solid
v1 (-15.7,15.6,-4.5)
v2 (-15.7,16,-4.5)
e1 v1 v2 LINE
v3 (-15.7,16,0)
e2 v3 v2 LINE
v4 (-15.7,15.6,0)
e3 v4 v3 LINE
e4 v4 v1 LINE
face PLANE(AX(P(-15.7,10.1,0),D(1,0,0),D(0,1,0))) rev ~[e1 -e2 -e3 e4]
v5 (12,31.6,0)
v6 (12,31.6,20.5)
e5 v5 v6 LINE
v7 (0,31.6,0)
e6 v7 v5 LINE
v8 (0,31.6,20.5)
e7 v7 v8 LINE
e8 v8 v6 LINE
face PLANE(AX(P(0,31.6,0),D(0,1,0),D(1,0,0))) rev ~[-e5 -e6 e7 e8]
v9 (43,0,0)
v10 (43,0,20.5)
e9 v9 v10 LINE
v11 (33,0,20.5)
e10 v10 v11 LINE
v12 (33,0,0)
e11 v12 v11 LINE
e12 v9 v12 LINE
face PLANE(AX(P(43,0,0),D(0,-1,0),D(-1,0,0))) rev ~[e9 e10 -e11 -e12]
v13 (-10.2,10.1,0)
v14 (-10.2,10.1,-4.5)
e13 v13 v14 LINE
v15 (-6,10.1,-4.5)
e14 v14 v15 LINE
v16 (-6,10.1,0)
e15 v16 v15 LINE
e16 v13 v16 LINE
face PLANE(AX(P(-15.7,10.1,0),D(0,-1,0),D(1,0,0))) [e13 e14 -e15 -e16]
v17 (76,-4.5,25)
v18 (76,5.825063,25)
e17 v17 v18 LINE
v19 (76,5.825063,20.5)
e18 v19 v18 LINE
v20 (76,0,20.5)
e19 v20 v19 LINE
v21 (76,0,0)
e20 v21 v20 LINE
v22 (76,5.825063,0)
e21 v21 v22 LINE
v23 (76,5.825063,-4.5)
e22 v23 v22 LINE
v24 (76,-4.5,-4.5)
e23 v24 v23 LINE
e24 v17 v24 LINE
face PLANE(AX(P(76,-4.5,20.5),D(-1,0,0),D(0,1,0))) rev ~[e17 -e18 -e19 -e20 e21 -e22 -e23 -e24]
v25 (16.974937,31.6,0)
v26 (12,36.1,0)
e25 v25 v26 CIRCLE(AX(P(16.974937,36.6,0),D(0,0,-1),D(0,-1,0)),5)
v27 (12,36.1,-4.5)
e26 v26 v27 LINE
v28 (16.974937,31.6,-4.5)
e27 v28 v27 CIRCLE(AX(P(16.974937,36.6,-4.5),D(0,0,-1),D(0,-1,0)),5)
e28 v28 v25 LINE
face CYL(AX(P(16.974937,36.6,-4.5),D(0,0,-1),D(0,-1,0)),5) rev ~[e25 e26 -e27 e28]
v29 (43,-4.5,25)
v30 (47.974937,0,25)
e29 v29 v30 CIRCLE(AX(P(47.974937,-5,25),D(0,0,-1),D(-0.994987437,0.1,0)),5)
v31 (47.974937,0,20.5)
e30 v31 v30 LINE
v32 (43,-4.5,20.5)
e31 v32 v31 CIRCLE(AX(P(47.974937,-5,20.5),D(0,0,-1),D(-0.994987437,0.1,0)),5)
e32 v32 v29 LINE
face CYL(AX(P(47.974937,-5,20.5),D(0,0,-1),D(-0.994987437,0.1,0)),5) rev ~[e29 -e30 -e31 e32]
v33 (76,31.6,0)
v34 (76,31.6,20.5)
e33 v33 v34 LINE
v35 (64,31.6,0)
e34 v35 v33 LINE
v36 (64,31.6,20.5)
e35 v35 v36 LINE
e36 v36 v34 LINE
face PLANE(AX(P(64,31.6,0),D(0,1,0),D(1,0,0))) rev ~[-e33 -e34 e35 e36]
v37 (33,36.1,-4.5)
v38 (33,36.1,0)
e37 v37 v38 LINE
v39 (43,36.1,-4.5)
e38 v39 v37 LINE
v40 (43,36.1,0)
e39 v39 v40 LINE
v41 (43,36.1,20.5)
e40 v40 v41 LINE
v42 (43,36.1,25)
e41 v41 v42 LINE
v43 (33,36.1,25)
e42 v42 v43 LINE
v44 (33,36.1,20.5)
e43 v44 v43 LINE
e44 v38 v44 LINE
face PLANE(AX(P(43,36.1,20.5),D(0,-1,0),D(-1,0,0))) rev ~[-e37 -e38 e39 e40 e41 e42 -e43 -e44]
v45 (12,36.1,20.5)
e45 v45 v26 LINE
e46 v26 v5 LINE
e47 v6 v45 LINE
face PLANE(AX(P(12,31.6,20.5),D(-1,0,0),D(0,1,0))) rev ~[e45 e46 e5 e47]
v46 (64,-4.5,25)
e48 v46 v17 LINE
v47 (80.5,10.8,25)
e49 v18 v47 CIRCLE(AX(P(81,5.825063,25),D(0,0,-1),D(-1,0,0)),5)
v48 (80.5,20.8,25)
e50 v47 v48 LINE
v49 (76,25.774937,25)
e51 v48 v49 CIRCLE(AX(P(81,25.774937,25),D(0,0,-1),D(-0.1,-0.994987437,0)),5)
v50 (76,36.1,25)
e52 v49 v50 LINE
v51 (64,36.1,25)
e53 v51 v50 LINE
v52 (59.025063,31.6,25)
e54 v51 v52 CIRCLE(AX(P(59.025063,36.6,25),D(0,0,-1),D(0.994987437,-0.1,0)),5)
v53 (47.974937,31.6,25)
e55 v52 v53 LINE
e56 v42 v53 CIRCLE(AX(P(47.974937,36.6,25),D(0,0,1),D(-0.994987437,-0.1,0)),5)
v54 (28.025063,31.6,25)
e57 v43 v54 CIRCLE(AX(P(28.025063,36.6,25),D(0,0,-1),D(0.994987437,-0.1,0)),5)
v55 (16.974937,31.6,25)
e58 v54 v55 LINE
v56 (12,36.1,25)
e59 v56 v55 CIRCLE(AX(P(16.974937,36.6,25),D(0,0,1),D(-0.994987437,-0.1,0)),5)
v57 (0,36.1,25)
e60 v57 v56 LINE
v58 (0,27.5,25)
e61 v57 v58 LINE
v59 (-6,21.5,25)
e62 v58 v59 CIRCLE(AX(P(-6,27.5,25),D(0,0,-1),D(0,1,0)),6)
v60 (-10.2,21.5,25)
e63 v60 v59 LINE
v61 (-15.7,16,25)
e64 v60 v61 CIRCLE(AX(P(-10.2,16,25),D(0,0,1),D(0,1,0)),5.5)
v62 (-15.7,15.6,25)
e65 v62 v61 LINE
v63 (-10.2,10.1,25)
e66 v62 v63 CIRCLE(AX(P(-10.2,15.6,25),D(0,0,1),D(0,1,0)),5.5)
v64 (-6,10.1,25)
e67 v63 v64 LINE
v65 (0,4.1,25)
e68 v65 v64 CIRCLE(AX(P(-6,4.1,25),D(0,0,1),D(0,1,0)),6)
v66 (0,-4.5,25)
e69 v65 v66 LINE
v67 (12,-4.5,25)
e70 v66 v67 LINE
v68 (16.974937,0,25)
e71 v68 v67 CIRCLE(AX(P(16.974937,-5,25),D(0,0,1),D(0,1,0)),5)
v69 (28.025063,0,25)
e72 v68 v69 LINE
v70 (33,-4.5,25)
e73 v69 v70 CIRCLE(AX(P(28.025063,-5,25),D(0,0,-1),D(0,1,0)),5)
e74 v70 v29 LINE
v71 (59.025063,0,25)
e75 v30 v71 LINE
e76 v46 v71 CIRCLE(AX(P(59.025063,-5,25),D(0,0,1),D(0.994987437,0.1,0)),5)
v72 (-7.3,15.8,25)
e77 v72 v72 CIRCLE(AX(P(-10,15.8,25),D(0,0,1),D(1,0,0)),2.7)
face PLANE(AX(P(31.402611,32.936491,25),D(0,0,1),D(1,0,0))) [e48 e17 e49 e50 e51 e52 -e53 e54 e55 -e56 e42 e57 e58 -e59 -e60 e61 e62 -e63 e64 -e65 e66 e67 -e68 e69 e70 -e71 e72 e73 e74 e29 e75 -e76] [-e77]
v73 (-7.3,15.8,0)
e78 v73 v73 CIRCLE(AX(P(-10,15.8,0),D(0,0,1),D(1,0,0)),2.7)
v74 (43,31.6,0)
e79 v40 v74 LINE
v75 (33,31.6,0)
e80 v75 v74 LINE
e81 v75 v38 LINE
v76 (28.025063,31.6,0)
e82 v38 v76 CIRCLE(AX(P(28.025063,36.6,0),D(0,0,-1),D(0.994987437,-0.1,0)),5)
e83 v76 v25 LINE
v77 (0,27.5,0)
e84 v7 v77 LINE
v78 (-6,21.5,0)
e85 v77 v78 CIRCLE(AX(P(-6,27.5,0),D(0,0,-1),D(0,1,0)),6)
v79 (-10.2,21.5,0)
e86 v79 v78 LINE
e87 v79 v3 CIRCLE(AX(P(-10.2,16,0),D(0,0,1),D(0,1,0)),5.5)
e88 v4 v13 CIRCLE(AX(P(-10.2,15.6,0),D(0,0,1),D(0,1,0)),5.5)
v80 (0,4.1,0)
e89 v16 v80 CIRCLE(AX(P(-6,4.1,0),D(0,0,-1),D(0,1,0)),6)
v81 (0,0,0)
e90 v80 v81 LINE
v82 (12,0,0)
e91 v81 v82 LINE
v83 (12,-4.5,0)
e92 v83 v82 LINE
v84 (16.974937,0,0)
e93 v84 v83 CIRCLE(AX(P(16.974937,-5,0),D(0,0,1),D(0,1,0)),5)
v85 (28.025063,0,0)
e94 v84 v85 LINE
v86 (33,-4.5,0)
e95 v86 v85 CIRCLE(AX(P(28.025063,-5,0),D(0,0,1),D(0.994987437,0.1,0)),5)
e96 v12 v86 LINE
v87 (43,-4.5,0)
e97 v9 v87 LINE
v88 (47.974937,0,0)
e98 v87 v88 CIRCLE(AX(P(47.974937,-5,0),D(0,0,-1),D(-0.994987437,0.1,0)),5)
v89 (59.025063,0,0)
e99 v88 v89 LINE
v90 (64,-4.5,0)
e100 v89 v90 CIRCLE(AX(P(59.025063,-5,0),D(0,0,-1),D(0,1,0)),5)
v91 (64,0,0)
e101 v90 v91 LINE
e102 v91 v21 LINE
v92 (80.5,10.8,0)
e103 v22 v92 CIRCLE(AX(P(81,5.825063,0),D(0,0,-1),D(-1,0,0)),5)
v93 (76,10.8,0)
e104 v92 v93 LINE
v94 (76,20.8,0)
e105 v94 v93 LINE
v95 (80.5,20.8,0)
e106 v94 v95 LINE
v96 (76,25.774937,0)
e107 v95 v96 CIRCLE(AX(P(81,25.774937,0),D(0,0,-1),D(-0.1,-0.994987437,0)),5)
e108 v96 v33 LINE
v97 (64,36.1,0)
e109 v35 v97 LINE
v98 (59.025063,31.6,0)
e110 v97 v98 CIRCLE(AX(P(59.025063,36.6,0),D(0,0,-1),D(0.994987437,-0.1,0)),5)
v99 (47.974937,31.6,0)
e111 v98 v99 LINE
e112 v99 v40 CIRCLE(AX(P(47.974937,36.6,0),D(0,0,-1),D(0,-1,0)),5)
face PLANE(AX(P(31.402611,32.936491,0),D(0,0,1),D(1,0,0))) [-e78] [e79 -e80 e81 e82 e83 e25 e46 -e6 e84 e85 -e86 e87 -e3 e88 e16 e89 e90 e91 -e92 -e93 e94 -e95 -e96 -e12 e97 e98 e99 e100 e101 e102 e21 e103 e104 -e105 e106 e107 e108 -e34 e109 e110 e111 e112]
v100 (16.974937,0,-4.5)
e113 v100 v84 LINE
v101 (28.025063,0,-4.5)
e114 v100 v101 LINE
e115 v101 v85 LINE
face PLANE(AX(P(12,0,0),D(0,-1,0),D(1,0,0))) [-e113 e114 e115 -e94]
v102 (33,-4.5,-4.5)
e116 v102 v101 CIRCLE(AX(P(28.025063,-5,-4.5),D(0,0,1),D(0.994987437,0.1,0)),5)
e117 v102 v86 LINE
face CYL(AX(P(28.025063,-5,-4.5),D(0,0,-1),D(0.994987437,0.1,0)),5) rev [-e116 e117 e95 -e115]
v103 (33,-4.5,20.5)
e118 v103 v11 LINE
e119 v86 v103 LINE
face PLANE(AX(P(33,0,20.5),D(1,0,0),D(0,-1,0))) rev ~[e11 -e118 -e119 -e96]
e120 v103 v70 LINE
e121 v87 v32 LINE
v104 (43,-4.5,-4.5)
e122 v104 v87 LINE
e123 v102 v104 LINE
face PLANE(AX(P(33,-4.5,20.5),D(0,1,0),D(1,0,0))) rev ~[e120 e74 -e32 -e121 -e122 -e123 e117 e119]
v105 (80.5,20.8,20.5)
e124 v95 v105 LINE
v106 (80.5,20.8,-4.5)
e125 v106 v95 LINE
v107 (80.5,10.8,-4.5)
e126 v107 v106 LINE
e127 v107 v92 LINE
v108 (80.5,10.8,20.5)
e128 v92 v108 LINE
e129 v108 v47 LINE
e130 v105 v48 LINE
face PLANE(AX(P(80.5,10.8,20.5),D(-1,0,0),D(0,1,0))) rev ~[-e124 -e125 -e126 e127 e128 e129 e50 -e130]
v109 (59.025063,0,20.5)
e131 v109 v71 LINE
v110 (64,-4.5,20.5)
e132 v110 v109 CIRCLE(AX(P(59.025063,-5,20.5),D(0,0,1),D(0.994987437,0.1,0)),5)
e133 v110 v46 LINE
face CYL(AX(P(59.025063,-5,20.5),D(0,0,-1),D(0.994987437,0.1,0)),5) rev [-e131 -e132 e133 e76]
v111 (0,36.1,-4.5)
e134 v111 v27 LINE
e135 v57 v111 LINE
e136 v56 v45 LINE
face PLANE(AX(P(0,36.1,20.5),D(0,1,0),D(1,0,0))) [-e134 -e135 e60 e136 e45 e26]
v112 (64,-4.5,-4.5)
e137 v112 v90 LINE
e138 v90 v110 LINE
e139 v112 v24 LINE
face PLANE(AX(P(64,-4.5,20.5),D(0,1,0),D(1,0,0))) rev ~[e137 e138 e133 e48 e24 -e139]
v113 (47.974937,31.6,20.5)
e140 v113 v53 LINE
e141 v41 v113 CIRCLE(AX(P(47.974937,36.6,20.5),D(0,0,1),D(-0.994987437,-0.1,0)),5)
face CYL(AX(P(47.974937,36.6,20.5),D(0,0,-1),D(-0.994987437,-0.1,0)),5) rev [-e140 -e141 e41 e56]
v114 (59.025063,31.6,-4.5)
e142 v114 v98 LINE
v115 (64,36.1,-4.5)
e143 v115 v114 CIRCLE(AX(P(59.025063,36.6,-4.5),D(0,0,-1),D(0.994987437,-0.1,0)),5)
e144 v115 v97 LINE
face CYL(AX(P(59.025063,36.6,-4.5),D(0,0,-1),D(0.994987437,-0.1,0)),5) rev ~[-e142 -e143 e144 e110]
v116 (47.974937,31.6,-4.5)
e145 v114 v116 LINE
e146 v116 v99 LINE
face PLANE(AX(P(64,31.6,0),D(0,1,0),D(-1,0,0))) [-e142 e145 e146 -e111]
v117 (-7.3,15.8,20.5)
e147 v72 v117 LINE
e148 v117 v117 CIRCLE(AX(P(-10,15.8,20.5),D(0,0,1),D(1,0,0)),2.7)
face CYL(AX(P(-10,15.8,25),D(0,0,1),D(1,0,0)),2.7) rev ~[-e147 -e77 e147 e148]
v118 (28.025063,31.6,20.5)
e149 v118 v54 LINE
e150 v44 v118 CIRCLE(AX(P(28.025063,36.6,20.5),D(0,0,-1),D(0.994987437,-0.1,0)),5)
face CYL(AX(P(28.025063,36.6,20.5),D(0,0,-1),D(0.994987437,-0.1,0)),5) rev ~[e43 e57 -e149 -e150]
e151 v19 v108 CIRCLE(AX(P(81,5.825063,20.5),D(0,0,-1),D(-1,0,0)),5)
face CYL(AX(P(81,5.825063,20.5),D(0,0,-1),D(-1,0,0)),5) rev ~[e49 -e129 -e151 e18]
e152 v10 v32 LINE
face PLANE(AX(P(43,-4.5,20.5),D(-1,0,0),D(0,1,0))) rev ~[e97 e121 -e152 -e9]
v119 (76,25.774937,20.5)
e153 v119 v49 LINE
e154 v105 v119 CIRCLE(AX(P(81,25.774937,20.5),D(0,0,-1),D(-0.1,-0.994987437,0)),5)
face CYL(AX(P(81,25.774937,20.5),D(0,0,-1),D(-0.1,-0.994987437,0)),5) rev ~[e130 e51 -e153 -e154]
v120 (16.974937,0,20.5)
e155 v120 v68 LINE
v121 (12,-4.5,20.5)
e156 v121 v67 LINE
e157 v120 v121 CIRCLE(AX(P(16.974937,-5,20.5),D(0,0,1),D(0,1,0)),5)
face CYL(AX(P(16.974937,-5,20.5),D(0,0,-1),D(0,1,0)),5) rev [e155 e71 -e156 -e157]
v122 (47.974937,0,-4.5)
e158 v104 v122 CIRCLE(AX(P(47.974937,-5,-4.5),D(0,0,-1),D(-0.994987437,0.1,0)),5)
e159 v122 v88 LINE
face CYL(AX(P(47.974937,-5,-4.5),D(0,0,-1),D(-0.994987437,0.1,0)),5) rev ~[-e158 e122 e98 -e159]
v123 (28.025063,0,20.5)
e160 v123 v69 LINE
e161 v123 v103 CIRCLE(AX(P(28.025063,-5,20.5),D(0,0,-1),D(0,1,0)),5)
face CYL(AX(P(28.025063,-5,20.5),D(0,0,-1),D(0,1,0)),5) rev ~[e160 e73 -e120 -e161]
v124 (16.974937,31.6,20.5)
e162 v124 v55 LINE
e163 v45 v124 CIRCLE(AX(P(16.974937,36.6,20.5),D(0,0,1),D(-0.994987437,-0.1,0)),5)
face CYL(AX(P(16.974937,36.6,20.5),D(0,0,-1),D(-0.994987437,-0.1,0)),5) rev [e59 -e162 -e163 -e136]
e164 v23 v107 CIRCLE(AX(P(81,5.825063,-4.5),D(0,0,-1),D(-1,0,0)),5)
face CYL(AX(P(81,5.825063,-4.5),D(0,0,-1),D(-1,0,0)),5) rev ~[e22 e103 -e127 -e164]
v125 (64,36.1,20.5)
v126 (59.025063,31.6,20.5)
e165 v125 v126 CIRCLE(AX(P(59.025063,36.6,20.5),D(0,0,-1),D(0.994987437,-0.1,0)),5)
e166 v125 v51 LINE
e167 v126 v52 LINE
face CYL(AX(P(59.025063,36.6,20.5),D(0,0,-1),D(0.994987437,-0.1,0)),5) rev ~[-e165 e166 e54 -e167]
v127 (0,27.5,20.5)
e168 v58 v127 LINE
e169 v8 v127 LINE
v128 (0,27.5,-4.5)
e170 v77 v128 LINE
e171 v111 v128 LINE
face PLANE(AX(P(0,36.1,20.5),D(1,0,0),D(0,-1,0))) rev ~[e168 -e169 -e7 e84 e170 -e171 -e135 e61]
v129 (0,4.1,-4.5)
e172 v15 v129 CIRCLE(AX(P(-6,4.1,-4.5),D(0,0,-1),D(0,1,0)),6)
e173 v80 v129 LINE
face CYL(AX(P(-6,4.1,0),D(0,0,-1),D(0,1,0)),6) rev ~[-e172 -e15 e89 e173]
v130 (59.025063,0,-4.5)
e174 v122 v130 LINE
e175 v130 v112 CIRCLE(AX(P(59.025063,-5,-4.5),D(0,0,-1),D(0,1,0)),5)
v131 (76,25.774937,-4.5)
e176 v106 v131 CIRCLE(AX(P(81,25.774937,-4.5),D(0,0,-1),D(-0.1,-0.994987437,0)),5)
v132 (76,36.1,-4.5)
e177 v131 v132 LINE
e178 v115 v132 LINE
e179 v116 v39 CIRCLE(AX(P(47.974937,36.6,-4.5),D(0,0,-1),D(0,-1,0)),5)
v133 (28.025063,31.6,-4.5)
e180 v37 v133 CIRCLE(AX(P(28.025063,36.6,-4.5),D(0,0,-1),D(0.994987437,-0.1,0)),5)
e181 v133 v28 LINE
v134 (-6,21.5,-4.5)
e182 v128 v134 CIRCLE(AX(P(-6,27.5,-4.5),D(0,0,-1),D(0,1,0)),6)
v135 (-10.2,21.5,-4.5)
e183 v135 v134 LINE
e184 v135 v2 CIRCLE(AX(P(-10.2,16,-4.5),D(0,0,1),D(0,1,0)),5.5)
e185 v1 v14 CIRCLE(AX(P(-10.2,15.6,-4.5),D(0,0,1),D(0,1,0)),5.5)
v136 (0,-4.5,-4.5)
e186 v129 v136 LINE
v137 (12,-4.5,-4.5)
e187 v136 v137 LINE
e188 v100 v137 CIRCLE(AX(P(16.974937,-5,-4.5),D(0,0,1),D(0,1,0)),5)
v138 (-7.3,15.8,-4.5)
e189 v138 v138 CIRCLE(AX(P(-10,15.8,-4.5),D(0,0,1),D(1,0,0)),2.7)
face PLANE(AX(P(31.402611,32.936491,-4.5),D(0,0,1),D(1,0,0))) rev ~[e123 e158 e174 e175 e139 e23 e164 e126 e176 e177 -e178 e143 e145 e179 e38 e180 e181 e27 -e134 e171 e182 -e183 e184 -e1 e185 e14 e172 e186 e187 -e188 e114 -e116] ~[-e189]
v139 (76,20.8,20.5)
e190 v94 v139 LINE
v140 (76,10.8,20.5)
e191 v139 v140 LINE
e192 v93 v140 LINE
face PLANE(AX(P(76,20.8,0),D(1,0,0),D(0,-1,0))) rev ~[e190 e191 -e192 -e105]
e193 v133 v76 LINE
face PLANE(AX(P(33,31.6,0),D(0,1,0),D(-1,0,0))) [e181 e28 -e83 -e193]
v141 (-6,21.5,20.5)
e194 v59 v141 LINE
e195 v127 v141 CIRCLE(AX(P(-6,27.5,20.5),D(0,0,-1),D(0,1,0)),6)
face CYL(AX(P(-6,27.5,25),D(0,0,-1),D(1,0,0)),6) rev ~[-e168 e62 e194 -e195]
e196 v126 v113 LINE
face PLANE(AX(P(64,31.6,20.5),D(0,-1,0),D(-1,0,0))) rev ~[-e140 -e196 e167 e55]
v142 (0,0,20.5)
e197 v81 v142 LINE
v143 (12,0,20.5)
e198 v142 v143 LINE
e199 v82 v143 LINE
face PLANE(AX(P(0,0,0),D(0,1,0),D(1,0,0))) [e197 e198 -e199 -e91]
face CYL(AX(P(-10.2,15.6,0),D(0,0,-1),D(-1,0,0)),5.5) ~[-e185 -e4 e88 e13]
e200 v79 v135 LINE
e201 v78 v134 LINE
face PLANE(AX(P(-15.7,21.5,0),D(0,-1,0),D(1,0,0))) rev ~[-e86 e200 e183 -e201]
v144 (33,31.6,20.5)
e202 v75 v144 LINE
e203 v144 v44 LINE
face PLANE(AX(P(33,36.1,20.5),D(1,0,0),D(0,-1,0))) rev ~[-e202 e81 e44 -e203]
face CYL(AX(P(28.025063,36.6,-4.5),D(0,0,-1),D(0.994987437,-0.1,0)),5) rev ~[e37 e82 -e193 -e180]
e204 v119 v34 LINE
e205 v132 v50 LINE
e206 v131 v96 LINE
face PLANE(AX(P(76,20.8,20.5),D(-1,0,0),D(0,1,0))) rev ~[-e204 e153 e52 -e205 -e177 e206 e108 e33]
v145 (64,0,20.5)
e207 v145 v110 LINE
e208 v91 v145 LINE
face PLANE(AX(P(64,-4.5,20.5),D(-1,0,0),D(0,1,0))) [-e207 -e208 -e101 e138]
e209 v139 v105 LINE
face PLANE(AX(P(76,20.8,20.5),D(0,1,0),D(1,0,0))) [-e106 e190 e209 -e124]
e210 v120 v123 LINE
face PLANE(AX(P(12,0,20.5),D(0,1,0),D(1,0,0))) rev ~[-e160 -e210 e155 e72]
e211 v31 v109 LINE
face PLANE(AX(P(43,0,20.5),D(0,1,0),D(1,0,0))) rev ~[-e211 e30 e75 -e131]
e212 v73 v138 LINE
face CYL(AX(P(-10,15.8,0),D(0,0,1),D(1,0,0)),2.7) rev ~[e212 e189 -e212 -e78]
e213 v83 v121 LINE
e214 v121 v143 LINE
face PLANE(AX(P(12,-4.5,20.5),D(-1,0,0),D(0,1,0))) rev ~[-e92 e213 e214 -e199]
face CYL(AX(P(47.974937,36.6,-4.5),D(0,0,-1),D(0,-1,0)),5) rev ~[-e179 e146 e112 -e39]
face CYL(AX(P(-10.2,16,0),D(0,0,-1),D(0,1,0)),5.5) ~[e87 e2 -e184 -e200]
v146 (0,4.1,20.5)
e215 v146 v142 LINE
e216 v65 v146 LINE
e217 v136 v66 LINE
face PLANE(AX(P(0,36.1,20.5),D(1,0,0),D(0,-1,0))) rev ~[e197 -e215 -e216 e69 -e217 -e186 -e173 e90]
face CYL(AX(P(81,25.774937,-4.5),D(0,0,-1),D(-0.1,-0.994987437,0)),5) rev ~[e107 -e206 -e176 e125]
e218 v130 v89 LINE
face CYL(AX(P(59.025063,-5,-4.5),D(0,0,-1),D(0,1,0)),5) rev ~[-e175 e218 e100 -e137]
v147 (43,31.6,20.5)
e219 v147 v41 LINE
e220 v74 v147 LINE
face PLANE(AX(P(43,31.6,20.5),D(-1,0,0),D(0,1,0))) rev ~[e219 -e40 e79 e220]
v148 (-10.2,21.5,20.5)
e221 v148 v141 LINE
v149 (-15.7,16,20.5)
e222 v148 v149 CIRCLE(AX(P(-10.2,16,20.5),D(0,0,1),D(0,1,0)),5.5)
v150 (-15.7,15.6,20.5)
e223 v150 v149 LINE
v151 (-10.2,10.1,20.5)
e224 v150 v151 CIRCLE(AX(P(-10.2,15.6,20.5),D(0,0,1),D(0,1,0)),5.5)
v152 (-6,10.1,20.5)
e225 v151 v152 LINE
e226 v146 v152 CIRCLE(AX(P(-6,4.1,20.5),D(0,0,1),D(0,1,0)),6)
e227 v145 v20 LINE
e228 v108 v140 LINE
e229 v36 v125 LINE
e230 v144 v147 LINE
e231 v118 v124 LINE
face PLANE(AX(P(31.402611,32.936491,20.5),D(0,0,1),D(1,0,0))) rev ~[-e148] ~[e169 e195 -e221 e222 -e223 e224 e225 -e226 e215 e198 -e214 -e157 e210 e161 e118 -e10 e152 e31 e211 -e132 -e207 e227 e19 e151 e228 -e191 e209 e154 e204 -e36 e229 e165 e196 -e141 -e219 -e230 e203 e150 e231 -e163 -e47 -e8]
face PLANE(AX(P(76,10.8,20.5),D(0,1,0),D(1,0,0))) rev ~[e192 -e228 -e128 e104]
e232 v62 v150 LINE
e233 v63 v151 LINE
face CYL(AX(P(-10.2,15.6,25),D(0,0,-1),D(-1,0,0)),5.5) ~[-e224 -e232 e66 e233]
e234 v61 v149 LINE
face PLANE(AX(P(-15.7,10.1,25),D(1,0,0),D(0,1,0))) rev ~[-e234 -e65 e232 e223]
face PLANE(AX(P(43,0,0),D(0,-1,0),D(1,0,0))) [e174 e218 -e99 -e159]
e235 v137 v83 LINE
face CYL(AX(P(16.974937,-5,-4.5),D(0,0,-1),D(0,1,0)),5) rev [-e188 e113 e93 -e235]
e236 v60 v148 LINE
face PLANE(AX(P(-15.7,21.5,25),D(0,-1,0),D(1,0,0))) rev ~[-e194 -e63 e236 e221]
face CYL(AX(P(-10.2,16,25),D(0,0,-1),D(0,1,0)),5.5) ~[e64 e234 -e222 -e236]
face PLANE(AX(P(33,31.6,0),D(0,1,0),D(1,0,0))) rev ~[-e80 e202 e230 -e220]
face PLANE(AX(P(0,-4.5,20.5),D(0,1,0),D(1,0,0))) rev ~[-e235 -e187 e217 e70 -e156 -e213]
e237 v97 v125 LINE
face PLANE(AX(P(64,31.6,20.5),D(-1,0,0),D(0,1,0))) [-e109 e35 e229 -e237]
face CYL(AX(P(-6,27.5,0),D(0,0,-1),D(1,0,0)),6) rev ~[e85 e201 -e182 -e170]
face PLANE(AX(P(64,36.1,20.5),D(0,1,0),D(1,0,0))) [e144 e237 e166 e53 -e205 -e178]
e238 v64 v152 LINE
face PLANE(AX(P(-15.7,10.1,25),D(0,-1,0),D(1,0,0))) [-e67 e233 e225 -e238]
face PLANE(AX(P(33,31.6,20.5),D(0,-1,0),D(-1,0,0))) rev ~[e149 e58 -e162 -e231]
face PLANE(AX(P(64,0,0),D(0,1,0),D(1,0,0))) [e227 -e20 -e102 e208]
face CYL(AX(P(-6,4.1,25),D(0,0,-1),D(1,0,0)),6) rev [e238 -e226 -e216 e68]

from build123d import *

# Parameters (mm, degrees)
F0_W        = 12
F0_H        = 4.5
F0_W_2      = 4.5
F0_H_2      = 5
F1_DEPTH    = 4.5
F2_DEPTH    = 20.5
F3_START    = 20.5
F3_DEPTH    = 4.5
F4_T1_DEPTH = 4.5
F4_T3_DEPTH = 4.5
F5_T1_DEPTH = 4.5
F5_T3_DEPTH = 4.5
F7_START    = -25
F6_W        = 15.7
F6_H        = 11.4
F6_R        = 2.7
F7_DEPTH    = 4.5
F8_DEPTH    = 4.5
F9_R        = 6
F10_R       = 5.5


# Not quite as in the source:
# - a fillet or chamfer that OpenCascade refuses, or shapes differently, is made with other operations: its cross-section is extruded or revolved along the edge and cut away or added


with BuildPart() as f1:
    # F0 (on Top) → F1 (new body)
    with BuildSketch(Plane.XY):
        Polygon((12, 31.6), (0, 31.6), (0, 0), (12, 0), (33, 0), (38, 0), (43, 0), (64, 0), (76, 0), (76, 10.8), (76, 15.8), (76, 20.8), (76, 31.6), (64, 31.6), (43, 31.6), (38, 31.6), (33, 31.6), align=None)
        with Locations((6, -2.25)):
            Rectangle(F0_W, F0_H)
        Polygon((38, 0), (33, 0), (33, -4.5), (43, -4.5), (43, 0), align=None)
        with Locations((70, -2.25)):
            Rectangle(F0_W, F0_H)
        with Locations((78.25, 13.3)):
            Rectangle(F0_W_2, F0_H_2)
        with Locations((78.25, 18.3)):
            Rectangle(F0_W_2, F0_H_2)
        with Locations((70, 33.85)):
            Rectangle(F0_W, F0_H)
        Polygon((33, 36.1), (33, 31.6), (38, 31.6), (43, 31.6), (43, 36.1), align=None)
        with Locations((6, 33.85)):
            Rectangle(F0_W, F0_H)
    extrude(amount=-F1_DEPTH)

    # F0 (on Top) → F2 (join)
    with BuildSketch(Plane.XY):
        with Locations((6, -2.25)):
            Rectangle(F0_W, F0_H)
        Polygon((38, 0), (33, 0), (33, -4.5), (43, -4.5), (43, 0), align=None)
        Polygon((33, 36.1), (33, 31.6), (38, 31.6), (43, 31.6), (43, 36.1), align=None)
        with Locations((6, 33.85)):
            Rectangle(F0_W, F0_H)
        with Locations((70, -2.25)):
            Rectangle(F0_W, F0_H)
        with Locations((78.25, 13.3)):
            Rectangle(F0_W_2, F0_H_2)
        with Locations((78.25, 18.3)):
            Rectangle(F0_W_2, F0_H_2)
        with Locations((70, 33.85)):
            Rectangle(F0_W, F0_H)
    extrude(amount=F2_DEPTH)

    # F0 (on Top) → F3 (join)
    with BuildSketch(Plane.XY.offset(F3_START)):
        with Locations((6, 33.85)):
            Rectangle(F0_W, F0_H)
        Polygon((12, 31.6), (0, 31.6), (0, 0), (12, 0), (33, 0), (38, 0), (43, 0), (64, 0), (76, 0), (76, 10.8), (76, 15.8), (76, 20.8), (76, 31.6), (64, 31.6), (43, 31.6), (38, 31.6), (33, 31.6), align=None)
        with Locations((6, -2.25)):
            Rectangle(F0_W, F0_H)
        Polygon((33, 36.1), (33, 31.6), (38, 31.6), (43, 31.6), (43, 36.1), align=None)
        Polygon((38, 0), (33, 0), (33, -4.5), (43, -4.5), (43, 0), align=None)
        with Locations((70, 33.85)):
            Rectangle(F0_W, F0_H)
        with Locations((70, -2.25)):
            Rectangle(F0_W, F0_H)
        with Locations((78.25, 18.3)):
            Rectangle(F0_W_2, F0_H_2)
        with Locations((78.25, 13.3)):
            Rectangle(F0_W_2, F0_H_2)
    extrude(amount=F3_DEPTH)

    # F4: fillet of radius 5 on 18 edges, made by hand

    # F4_s2 → F4_t1 (join)
    with BuildSketch(Plane.XY.offset(20.5)):
        with BuildLine():
            ThreePointArc((16.9749371855, 0), (13.6208352193, -1.2919007565), (12, -4.5))
            Line((12, -4.5), (12, 0))
            Line((12, 0), (16.9749371855, 0))
        make_face()
        with BuildLine():
            ThreePointArc((28.0250628145, 0), (31.3791647807, -1.2919007565), (33, -4.5))
            Line((33, -4.5), (33, 0))
            Line((33, 0), (28.0250628145, 0))
        make_face()
        with BuildLine():
            ThreePointArc((43, -4.5), (44.6208352193, -1.2919007565), (47.9749371855, 0))
            Line((47.9749371855, 0), (43, 0))
            Line((43, 0), (43, -4.5))
        make_face()
        with BuildLine():
            ThreePointArc((64, -4.5), (62.3791647807, -1.2919007565), (59.0250628145, 0))
            Line((59.0250628145, 0), (64, 0))
            Line((64, 0), (64, -4.5))
        make_face()
        with BuildLine():
            ThreePointArc((76, 5.8250628145), (77.2919007565, 9.1791647807), (80.5, 10.8))
            Line((80.5, 10.8), (76, 10.8))
            Line((76, 10.8), (76, 5.8250628145))
        make_face()
        with BuildLine():
            ThreePointArc((80.5, 20.8), (77.2919007565, 22.4208352193), (76, 25.7749371855))
            Line((76, 25.7749371855), (76, 20.8))
            Line((76, 20.8), (80.5, 20.8))
        make_face()
        with BuildLine():
            ThreePointArc((43, 36.1), (44.6208352193, 32.8919007565), (47.9749371855, 31.6))
            Line((47.9749371855, 31.6), (43, 31.6))
            Line((43, 31.6), (43, 36.1))
        make_face()
        with BuildLine():
            ThreePointArc((12, 36.1), (13.6208352193, 32.8919007565), (16.9749371855, 31.6))
            Line((16.9749371855, 31.6), (12, 31.6))
            Line((12, 31.6), (12, 36.1))
        make_face()
        with BuildLine():
            ThreePointArc((64, 36.1), (62.3791647807, 32.8919007565), (59.0250628145, 31.6))
            Line((59.0250628145, 31.6), (64, 31.6))
            Line((64, 31.6), (64, 36.1))
        make_face()
    extrude(amount=F4_T1_DEPTH)

    # F4_s4 → F4_t3 (join)
    with BuildSketch(Plane.XY.offset(-4.5)):
        with BuildLine():
            ThreePointArc((16.9749371855, 0), (13.6208352193, -1.2919007565), (12, -4.5))
            Line((12, -4.5), (12, 0))
            Line((12, 0), (16.9749371855, 0))
        make_face()
        with BuildLine():
            ThreePointArc((33, -4.5), (31.3791647807, -1.2919007565), (28.0250628145, 0))
            Line((28.0250628145, 0), (33, 0))
            Line((33, 0), (33, -4.5))
        make_face()
        with BuildLine():
            ThreePointArc((43, -4.5), (44.6208352193, -1.2919007565), (47.9749371855, 0))
            Line((47.9749371855, 0), (43, 0))
            Line((43, 0), (43, -4.5))
        make_face()
        with BuildLine():
            ThreePointArc((59.0250628145, 0), (62.3791647807, -1.2919007565), (64, -4.5))
            Line((64, -4.5), (64, 0))
            Line((64, 0), (59.0250628145, 0))
        make_face()
        with BuildLine():
            ThreePointArc((76, 5.8250628145), (77.2919007565, 9.1791647807), (80.5, 10.8))
            Line((80.5, 10.8), (76, 10.8))
            Line((76, 10.8), (76, 5.8250628145))
        make_face()
        with BuildLine():
            ThreePointArc((80.5, 20.8), (77.2919007565, 22.4208352193), (76, 25.7749371855))
            Line((76, 25.7749371855), (76, 20.8))
            Line((76, 20.8), (80.5, 20.8))
        make_face()
        with BuildLine():
            ThreePointArc((47.9749371855, 31.6), (44.6208352193, 32.8919007565), (43, 36.1))
            Line((43, 36.1), (43, 31.6))
            Line((43, 31.6), (47.9749371855, 31.6))
        make_face()
        with BuildLine():
            ThreePointArc((16.9749371855, 31.6), (13.6208352193, 32.8919007565), (12, 36.1))
            Line((12, 36.1), (12, 31.6))
            Line((12, 31.6), (16.9749371855, 31.6))
        make_face()
        with BuildLine():
            ThreePointArc((64, 36.1), (62.3791647807, 32.8919007565), (59.0250628145, 31.6))
            Line((59.0250628145, 31.6), (64, 31.6))
            Line((64, 31.6), (64, 36.1))
        make_face()
    extrude(amount=F4_T3_DEPTH)

    # F5: fillet of radius 5 on 2 edges, made by hand

    # F5_s2 → F5_t1 (join)
    with BuildSketch(Plane.XY.offset(20.5)):
        with BuildLine():
            ThreePointArc((33, 36.1), (31.3791647807, 32.8919007565), (28.0250628145, 31.6))
            Line((28.0250628145, 31.6), (33, 31.6))
            Line((33, 31.6), (33, 36.1))
        make_face()
    extrude(amount=F5_T1_DEPTH)

    # F5_s4 → F5_t3 (join)
    with BuildSketch(Plane.XY.offset(-4.5)):
        with BuildLine():
            ThreePointArc((33, 36.1), (31.3791647807, 32.8919007565), (28.0250628145, 31.6))
            Line((28.0250628145, 31.6), (33, 31.6))
            Line((33, 31.6), (33, 36.1))
        make_face()
    extrude(amount=F5_T3_DEPTH)

    # F6 (on face) → F7 (join)
    with BuildSketch(Plane.XY.offset(25).offset(F7_START)):
        with Locations((-7.85, 15.8)):
            Rectangle(F6_W, F6_H)
        with Locations((-10, 15.8)):
            Circle(F6_R, mode=Mode.SUBTRACT)
    extrude(amount=-F7_DEPTH)

    # F6 (on face) → F8 (join)
    with BuildSketch(Plane.XY.offset(25)):
        with Locations((-7.85, 15.8)):
            Rectangle(F6_W, F6_H)
        with Locations((-10, 15.8)):
            Circle(F6_R, mode=Mode.SUBTRACT)
    extrude(amount=-F8_DEPTH)

    # F9
    f9_edges = [f1.edges().sort_by_distance(p)[0] for p in [
        (0, 21.5, 22.75),
        (0, 10.1, 22.75),
        (0, 10.1, -2.25),
        (0, 21.5, -2.25),
    ]]
    fillet(f9_edges, radius=F9_R)

    # F10
    f10_edges = [f1.edges().sort_by_distance(p)[0] for p in [
        (-15.7, 21.5, 22.75),
        (-15.7, 10.1, 22.75),
        (-15.7, 10.1, -2.25),
        (-15.7, 21.5, -2.25),
    ]]
    fillet(f10_edges, radius=F10_R)


solid = f1.part
